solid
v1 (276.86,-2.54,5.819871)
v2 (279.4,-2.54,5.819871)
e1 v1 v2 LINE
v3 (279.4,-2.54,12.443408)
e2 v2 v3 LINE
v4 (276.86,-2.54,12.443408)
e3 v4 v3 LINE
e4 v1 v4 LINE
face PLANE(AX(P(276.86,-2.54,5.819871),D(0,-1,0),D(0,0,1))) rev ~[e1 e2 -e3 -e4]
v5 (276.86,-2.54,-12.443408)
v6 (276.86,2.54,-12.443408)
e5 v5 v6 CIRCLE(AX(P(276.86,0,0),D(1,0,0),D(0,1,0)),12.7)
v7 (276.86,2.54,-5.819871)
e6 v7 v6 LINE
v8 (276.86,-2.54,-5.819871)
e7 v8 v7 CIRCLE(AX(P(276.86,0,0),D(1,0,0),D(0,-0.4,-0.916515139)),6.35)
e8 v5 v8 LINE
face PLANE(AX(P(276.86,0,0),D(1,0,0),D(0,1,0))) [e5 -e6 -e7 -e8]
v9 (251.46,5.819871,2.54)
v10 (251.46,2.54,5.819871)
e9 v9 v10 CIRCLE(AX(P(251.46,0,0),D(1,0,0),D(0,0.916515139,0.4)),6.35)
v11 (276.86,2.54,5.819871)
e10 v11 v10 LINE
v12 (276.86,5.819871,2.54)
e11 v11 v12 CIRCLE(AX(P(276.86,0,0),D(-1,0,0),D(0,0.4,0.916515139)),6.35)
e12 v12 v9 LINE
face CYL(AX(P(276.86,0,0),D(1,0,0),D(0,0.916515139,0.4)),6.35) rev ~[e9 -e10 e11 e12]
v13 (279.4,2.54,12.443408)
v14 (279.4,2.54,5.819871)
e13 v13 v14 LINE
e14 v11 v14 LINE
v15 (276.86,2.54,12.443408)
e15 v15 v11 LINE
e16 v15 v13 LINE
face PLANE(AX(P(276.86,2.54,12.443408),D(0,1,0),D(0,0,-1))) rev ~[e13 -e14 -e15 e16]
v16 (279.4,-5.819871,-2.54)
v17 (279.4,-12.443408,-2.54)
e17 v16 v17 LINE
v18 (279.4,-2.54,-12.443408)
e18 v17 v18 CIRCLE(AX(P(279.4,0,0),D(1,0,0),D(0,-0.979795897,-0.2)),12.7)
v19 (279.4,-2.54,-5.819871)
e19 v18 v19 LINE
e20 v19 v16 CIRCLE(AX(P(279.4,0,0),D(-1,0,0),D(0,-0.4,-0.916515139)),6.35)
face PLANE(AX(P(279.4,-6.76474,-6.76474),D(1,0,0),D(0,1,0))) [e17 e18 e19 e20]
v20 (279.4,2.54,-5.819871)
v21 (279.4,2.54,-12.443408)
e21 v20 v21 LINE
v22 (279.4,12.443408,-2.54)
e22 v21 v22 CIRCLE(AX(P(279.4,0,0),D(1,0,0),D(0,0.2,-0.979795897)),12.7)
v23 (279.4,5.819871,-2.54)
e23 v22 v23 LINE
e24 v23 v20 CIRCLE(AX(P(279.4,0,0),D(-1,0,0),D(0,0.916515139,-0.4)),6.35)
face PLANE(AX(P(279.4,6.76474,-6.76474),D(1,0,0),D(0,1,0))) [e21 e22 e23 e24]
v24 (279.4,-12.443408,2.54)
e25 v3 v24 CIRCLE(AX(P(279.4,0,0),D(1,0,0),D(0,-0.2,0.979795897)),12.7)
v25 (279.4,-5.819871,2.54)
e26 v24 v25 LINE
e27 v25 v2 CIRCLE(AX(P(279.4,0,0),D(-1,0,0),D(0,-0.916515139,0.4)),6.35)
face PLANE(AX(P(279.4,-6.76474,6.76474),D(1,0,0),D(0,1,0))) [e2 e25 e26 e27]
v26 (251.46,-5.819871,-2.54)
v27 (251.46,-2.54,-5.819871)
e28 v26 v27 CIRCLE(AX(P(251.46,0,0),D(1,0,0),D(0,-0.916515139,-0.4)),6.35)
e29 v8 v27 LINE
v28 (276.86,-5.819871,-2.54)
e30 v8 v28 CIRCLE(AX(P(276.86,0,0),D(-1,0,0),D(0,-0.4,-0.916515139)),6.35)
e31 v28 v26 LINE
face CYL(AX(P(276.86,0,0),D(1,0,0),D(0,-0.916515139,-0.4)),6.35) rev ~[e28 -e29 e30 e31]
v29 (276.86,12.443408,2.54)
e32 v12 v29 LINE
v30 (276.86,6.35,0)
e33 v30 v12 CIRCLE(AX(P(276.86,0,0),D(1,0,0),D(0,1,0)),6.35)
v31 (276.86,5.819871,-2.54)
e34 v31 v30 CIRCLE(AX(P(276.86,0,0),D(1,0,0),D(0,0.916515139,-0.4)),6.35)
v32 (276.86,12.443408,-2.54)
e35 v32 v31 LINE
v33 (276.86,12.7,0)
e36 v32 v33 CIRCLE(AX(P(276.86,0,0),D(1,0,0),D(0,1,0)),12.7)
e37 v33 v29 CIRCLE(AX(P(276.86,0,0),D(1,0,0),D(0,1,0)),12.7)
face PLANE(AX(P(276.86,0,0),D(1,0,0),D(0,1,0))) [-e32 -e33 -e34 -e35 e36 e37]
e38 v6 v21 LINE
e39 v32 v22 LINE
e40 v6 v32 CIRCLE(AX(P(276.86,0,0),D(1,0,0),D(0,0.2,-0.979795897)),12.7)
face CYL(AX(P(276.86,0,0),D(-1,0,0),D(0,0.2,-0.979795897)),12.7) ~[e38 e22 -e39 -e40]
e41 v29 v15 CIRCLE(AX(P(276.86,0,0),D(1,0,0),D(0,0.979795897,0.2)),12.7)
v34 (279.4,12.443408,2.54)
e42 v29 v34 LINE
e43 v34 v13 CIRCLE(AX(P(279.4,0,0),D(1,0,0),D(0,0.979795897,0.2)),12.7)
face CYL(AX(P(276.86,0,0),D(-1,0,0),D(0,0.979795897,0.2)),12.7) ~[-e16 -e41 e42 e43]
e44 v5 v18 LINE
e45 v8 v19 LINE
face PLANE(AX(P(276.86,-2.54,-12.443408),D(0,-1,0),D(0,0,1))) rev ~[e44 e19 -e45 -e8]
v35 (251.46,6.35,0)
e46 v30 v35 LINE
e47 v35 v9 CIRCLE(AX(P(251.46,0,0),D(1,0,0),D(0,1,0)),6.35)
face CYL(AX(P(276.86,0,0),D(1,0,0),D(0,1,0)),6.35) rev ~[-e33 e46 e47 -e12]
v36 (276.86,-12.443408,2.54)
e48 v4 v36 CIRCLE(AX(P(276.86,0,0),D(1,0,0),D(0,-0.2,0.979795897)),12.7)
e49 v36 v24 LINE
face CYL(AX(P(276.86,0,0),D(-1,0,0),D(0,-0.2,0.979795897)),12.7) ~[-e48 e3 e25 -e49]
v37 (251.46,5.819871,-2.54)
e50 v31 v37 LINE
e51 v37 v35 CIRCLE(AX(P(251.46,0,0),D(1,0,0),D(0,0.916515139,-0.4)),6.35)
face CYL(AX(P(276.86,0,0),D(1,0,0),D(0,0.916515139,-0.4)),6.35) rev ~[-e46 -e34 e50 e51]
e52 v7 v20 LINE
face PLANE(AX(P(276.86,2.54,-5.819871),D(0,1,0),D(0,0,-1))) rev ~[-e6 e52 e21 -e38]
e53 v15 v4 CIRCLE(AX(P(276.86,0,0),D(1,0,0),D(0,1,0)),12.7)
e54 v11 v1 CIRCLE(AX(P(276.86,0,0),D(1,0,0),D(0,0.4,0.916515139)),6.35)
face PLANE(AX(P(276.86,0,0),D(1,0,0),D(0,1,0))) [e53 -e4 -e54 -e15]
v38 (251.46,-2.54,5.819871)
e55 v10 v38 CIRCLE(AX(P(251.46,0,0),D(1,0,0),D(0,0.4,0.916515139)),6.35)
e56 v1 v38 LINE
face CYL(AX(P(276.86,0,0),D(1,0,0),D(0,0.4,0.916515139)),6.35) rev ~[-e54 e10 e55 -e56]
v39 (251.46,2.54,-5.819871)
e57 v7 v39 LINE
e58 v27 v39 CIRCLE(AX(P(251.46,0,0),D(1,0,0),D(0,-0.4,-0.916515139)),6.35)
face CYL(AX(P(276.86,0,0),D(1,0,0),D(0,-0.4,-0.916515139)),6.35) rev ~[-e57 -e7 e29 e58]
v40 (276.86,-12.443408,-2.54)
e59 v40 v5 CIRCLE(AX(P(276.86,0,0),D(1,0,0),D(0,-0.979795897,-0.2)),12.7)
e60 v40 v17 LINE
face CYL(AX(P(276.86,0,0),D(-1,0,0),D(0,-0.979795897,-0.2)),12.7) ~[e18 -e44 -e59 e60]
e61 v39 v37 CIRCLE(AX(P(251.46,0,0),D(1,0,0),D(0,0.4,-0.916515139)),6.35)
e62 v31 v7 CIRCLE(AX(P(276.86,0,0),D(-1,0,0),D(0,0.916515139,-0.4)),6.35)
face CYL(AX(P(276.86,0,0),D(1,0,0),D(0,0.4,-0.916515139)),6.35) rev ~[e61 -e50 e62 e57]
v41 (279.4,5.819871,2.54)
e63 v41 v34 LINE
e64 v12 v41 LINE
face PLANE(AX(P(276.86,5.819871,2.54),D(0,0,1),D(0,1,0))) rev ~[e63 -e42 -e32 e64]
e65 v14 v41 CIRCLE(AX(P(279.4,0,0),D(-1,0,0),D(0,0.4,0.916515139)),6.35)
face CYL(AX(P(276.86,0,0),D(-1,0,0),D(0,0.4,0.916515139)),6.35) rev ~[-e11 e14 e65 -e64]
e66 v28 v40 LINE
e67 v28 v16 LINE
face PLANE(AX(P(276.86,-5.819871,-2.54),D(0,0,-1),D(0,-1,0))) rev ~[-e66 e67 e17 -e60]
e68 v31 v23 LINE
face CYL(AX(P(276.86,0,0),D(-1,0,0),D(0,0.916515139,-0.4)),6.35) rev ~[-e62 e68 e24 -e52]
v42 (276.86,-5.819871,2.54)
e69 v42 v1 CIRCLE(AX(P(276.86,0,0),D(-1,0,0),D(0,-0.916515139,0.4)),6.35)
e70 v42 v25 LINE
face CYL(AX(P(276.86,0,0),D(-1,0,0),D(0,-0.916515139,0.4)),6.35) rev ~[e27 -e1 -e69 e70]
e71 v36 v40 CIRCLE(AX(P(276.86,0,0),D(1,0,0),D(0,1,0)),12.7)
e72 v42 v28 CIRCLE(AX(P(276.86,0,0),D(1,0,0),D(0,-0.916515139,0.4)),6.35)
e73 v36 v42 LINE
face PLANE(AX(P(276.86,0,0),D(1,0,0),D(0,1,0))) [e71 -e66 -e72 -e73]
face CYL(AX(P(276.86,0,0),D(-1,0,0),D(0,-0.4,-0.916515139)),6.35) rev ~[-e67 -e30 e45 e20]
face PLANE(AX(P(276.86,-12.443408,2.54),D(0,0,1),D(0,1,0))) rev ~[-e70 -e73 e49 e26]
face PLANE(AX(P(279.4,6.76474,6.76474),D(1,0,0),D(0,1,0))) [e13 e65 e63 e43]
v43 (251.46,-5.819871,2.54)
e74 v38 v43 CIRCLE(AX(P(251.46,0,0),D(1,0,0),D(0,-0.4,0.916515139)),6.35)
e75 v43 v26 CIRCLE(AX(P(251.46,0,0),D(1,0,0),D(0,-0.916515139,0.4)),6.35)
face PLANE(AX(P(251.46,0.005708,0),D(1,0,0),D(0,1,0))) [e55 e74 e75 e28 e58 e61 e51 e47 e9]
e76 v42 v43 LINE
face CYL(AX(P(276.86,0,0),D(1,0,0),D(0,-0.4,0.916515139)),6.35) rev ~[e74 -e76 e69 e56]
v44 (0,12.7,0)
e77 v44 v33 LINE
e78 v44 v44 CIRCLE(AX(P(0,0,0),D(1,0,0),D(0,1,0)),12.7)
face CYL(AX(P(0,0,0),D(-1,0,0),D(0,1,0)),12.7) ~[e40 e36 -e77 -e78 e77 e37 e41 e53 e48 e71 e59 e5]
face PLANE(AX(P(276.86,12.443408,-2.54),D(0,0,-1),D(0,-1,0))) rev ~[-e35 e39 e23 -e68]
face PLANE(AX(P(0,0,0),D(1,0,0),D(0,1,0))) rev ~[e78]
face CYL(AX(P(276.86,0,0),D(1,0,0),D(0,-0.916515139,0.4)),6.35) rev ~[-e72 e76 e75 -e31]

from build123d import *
from build123d import SkipClean  # not in build123d's __all__

# Parameters (mm, degrees)
F0_R     = 12.7
F1_DEPTH = 276.86
F3_DEPTH = 2.54
F4_DEPTH = 25.4


with BuildPart() as f1:
    # F0 (on Right) → F1 (new body)
    with BuildSketch(Plane.YZ):
        Circle(F0_R)
    extrude(amount=F1_DEPTH)

    # F2 (on face) → F3 (join)
    with BuildSketch(Plane.YZ.offset(276.86)):
        with BuildLine():
            ThreePointArc((2.54, 5.8198711326), (4.4901280605, 4.4901280605), (5.8198711326, 2.54))
            Line((5.8198711326, 2.54), (12.4434078933, 2.54))
            ThreePointArc((12.4434078933, 2.54), (8.9802561211, 8.9802561211), (2.54, 12.4434078933))
            Line((2.54, 12.4434078933), (2.54, 5.8198711326))
        make_face()
        with BuildLine():
            ThreePointArc((-5.8198711326, 2.54), (-4.4901280605, 4.4901280605), (-2.54, 5.8198711326))
            Line((-2.54, 5.8198711326), (-2.54, 12.4434078933))
            ThreePointArc((-2.54, 12.4434078933), (-8.9802561211, 8.9802561211), (-12.4434078933, 2.54))
            Line((-12.4434078933, 2.54), (-5.8198711326, 2.54))
        make_face()
        with BuildLine():
            Line((-2.54, -12.4434078933), (-2.54, -5.8198711326))
            ThreePointArc((-2.54, -5.8198711326), (-4.4901280605, -4.4901280605), (-5.8198711326, -2.54))
            Line((-5.8198711326, -2.54), (-12.4434078933, -2.54))
            ThreePointArc((-12.4434078933, -2.54), (-8.9802561211, -8.9802561211), (-2.54, -12.4434078933))
        make_face()
        with BuildLine():
            Line((12.4434078933, -2.54), (5.8198711326, -2.54))
            ThreePointArc((5.8198711326, -2.54), (4.4901280605, -4.4901280605), (2.54, -5.8198711326))
            Line((2.54, -5.8198711326), (2.54, -12.4434078933))
            ThreePointArc((2.54, -12.4434078933), (8.9802561211, -8.9802561211), (12.4434078933, -2.54))
        make_face()
    extrude(amount=F3_DEPTH)

    # F2 (on face) → F4 (cut)
    with BuildSketch(Plane.YZ.offset(276.86)):
        with BuildLine():
            ThreePointArc((5.8198711326, -2.54), (6.2160550871, -1.2973662374), (6.35, 0))
            ThreePointArc((6.35, 0), (6.2160550871, 1.2973662374), (5.8198711326, 2.54))
            ThreePointArc((5.8198711326, 2.54), (4.4901280605, 4.4901280605), (2.54, 5.8198711326))
            ThreePointArc((2.54, 5.8198711326), (0, 6.35), (-2.54, 5.8198711326))
            ThreePointArc((-2.54, 5.8198711326), (-4.4901280605, 4.4901280605), (-5.8198711326, 2.54))
            ThreePointArc((-5.8198711326, 2.54), (-6.35, 0), (-5.8198711326, -2.54))
            ThreePointArc((-5.8198711326, -2.54), (-4.4901280605, -4.4901280605), (-2.54, -5.8198711326))
            ThreePointArc((-2.54, -5.8198711326), (0, -6.35), (2.54, -5.8198711326))
            ThreePointArc((2.54, -5.8198711326), (4.4901280605, -4.4901280605), (5.8198711326, -2.54))
        make_face()
    with SkipClean():  # cleaning this boolean's faces spoils the solid; the shape is the same uncleaned
        extrude(amount=-F4_DEPTH, mode=Mode.SUBTRACT)


solid = f1.part
